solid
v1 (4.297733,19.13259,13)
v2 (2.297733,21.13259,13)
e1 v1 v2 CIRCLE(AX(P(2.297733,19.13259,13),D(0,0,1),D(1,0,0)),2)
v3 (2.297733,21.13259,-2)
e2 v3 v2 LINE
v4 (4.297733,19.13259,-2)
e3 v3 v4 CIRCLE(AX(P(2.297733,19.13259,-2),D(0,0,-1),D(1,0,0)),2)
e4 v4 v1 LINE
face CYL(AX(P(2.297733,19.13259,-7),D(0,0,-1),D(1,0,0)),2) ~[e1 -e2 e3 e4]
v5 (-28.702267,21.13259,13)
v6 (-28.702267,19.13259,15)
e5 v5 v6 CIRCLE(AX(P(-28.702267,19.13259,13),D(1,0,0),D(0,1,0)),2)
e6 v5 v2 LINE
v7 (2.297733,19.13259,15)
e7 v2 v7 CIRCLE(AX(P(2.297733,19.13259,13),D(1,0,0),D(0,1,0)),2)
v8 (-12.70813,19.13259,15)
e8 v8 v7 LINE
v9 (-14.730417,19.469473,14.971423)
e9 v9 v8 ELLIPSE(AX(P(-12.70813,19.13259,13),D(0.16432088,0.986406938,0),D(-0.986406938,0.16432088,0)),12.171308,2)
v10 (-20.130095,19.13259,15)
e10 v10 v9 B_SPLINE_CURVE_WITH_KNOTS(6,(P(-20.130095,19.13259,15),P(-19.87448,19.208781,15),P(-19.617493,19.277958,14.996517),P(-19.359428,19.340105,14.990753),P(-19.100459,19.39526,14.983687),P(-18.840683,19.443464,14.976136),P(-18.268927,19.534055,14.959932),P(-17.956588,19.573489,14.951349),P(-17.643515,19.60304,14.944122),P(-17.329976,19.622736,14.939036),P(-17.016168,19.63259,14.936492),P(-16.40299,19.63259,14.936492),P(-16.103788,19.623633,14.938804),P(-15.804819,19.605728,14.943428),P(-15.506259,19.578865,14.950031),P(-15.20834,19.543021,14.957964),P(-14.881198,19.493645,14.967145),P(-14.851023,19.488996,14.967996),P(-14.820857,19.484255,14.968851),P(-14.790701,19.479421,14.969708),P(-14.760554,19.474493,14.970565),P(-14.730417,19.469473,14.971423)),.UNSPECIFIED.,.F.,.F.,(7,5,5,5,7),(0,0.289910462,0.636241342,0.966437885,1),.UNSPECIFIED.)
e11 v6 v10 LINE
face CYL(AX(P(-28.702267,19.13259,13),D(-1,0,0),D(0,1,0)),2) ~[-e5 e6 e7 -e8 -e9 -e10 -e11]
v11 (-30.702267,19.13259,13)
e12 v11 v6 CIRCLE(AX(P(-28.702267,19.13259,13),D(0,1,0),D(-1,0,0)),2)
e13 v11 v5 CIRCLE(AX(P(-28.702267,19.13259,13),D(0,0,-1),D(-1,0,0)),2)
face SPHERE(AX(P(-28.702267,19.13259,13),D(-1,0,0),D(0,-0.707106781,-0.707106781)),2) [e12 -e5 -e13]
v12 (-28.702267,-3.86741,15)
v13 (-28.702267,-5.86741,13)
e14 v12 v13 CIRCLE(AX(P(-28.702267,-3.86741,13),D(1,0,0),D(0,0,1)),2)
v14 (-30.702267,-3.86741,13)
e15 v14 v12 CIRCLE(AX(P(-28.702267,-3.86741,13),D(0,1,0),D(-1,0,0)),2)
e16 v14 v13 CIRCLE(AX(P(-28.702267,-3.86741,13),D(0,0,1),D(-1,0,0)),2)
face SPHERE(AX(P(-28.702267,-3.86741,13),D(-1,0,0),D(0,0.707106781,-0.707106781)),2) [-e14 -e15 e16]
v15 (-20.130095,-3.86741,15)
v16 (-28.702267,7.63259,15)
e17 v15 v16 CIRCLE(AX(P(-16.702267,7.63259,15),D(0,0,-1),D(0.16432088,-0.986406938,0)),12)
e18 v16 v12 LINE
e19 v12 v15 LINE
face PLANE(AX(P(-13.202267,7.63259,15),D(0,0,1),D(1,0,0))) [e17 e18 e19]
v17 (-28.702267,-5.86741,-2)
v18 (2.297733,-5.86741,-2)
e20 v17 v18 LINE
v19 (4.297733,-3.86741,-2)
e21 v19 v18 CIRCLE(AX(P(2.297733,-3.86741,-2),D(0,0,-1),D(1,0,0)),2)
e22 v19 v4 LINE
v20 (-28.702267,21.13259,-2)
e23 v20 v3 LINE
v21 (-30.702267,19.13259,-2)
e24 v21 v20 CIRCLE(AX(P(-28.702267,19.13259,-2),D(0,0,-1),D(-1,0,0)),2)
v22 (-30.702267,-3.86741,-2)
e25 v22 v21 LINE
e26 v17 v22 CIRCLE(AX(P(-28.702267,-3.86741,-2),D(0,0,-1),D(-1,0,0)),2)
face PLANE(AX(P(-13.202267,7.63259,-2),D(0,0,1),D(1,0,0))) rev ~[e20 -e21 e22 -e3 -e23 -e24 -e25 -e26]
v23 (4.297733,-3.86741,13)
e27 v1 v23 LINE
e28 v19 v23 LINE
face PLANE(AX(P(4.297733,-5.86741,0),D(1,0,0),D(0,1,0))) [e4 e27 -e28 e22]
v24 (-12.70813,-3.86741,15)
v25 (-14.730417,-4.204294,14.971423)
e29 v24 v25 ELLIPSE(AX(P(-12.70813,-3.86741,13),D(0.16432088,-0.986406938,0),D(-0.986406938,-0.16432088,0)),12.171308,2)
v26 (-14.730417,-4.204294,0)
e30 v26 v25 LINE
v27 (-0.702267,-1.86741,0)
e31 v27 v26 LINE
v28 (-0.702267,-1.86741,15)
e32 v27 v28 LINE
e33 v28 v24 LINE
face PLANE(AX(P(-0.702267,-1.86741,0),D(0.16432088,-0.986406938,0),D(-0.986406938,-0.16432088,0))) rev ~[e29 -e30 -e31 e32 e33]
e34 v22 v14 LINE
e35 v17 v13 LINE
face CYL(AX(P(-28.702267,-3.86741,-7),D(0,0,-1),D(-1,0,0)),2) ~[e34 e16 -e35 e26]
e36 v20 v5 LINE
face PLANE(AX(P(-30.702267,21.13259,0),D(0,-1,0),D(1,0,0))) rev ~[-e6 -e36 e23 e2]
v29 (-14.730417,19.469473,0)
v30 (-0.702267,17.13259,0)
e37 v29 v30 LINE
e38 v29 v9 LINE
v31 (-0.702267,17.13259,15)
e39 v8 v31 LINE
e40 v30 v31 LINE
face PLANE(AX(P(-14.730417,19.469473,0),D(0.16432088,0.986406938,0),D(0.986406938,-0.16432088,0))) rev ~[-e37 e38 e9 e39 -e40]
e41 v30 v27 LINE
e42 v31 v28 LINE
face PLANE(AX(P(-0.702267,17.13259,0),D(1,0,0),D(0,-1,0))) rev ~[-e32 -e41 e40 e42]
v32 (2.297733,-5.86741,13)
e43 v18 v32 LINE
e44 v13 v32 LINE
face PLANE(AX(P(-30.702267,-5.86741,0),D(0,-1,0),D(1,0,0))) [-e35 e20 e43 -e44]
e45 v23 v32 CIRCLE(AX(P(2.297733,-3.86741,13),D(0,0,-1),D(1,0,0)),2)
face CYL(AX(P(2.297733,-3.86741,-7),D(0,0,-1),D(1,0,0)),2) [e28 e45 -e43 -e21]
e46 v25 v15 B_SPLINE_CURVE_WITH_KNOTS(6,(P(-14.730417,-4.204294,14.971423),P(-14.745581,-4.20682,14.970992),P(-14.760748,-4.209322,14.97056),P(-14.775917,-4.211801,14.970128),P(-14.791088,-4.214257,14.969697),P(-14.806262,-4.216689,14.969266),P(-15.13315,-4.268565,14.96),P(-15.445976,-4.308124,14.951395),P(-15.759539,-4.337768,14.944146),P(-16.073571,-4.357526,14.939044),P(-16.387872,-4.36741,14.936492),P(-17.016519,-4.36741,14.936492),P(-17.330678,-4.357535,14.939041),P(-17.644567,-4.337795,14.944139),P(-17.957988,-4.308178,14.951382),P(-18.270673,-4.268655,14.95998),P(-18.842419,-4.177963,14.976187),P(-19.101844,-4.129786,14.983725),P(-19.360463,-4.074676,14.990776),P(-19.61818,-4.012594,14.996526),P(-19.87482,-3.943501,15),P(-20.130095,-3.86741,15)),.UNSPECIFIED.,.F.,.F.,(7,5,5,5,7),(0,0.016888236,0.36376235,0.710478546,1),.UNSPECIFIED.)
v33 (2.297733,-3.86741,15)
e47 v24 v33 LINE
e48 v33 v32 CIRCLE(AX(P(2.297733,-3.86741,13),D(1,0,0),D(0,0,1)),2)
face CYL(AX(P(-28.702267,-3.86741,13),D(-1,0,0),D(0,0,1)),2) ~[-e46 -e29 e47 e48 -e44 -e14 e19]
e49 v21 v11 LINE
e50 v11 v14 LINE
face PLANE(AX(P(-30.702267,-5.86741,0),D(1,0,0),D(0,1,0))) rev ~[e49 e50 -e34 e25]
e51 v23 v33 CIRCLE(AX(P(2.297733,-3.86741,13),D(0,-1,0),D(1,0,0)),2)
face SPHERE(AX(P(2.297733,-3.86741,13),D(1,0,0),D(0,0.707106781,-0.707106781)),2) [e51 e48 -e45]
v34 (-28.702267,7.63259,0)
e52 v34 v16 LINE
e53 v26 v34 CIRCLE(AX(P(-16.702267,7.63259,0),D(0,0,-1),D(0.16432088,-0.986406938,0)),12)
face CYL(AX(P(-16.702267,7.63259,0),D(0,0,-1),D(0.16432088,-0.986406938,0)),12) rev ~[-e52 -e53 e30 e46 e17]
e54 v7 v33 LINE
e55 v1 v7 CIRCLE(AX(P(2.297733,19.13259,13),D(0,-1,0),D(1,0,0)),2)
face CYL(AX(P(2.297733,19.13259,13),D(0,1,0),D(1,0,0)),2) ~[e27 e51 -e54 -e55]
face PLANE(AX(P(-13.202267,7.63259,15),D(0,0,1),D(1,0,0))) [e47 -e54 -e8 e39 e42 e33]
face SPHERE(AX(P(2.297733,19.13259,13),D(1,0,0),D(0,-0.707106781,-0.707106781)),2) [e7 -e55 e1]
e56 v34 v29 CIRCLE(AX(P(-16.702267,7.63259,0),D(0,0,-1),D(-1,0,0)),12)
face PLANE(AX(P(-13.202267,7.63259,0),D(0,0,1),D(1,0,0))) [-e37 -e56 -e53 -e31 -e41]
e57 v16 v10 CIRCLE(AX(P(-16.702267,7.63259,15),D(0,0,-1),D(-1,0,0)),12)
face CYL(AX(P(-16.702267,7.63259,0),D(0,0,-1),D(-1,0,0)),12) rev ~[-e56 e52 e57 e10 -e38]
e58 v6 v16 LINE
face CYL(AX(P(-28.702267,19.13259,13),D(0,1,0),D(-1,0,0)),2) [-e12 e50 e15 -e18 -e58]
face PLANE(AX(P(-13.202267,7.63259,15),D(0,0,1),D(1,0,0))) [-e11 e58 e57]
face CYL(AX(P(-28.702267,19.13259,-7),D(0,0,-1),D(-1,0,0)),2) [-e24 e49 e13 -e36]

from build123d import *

# Parameters (mm, degrees)
F0_W         = 35
F0_H         = 27
F1_DEPTH     = 15
F2_DEPTH     = 2
F3_T1_DEPTH  = 20
F3_T3_DEPTH  = 31
F3_T5_DEPTH  = 23
F3_S9_W      = 2
F3_S9_H      = 2
F3_T10_DEPTH = 2
F3_S15_W     = 2
F3_S15_H     = 2
F3_T16_DEPTH = 2
F3_S21_W     = 2
F3_S21_H     = 2
F3_T22_DEPTH = 2
F3_S27_W     = 2
F3_S27_H     = 2
F3_T28_DEPTH = 2


# Not quite as in the source:
# - a fillet or chamfer that OpenCascade refuses, or shapes differently, is made with other operations: its cross-section is extruded or revolved along the edge and cut away or added


with BuildPart() as f1:
    # F0 (on Top) → F1 (new body)
    with BuildSketch(Plane.XY):
        with Locations((-13.2022674233, 7.6325895488)):
            Rectangle(F0_W, F0_H)
        with BuildLine():
            Line((-14.73041686, 19.4694728107), (-0.7022674233, 17.1325895488))
            Line((-0.7022674233, 17.1325895488), (-0.7022674233, 7.6325895488))
            Line((-0.7022674233, 7.6325895488), (-0.7022674233, -1.8674104512))
            Line((-0.7022674233, -1.8674104512), (-14.73041686, -4.2042937131))
            ThreePointArc((-14.73041686, -4.2042937131), (-24.4591286842, -1.5233431387), (-28.7022674233, 7.6325895488))
            ThreePointArc((-28.7022674233, 7.6325895488), (-24.4591286842, 16.7885222364), (-14.73041686, 19.4694728107))
        make_face(mode=Mode.SUBTRACT)
    extrude(amount=F1_DEPTH)

    # F0 (on Top) → F2 (join)
    with BuildSketch(Plane.XY):
        with Locations((-13.2022674233, 7.6325895488)):
            Rectangle(F0_W, F0_H)
        with BuildLine():
            Line((-14.73041686, 19.4694728107), (-0.7022674233, 17.1325895488))
            Line((-0.7022674233, 17.1325895488), (-0.7022674233, 7.6325895488))
            Line((-0.7022674233, 7.6325895488), (-0.7022674233, -1.8674104512))
            Line((-0.7022674233, -1.8674104512), (-14.73041686, -4.2042937131))
            ThreePointArc((-14.73041686, -4.2042937131), (-24.4591286842, -1.5233431387), (-28.7022674233, 7.6325895488))
            ThreePointArc((-28.7022674233, 7.6325895488), (-24.4591286842, 16.7885222364), (-14.73041686, 19.4694728107))
        make_face(mode=Mode.SUBTRACT)
        with BuildLine():
            ThreePointArc((-14.73041686, -4.2042937131), (-7.5463347357, -0.1242717121), (-4.7022674233, 7.6325895488))
            Line((-4.7022674233, 7.6325895488), (-28.7022674233, 7.6325895488))
            ThreePointArc((-28.7022674233, 7.6325895488), (-24.4591286842, -1.5233431387), (-14.73041686, -4.2042937131))
        make_face()
        with BuildLine():
            ThreePointArc((-4.7022674233, 7.6325895488), (-7.5463347357, 15.3894508097), (-14.73041686, 19.4694728107))
            ThreePointArc((-14.73041686, 19.4694728107), (-24.4591286842, 16.7885222364), (-28.7022674233, 7.6325895488))
            Line((-28.7022674233, 7.6325895488), (-4.7022674233, 7.6325895488))
        make_face()
        with BuildLine():
            Line((-0.7022674233, 7.6325895488), (-0.7022674233, 17.1325895488))
            Line((-0.7022674233, 17.1325895488), (-14.73041686, 19.4694728107))
            ThreePointArc((-14.73041686, 19.4694728107), (-7.5463347357, 15.3894508097), (-4.7022674233, 7.6325895488))
            Line((-4.7022674233, 7.6325895488), (-0.7022674233, 7.6325895488))
        make_face()
        with BuildLine():
            Line((-0.7022674233, -1.8674104512), (-0.7022674233, 7.6325895488))
            Line((-0.7022674233, 7.6325895488), (-4.7022674233, 7.6325895488))
            ThreePointArc((-4.7022674233, 7.6325895488), (-7.5463347357, -0.1242717121), (-14.73041686, -4.2042937131))
            Line((-14.73041686, -4.2042937131), (-0.7022674233, -1.8674104512))
        make_face()
    extrude(amount=-F2_DEPTH)

    # F3: fillet of radius 2 on 8 edges, made by hand

    # F3_s2 → F3_t1 (cut)
    with BuildSketch(Plane.XY.offset(-7)):
        with BuildLine():
            ThreePointArc((-30.7022674233, -3.8674104512), (-30.1164809856, -5.2816240135), (-28.7022674233, -5.8674104512))
            Line((-28.7022674233, -5.8674104512), (-30.7022674233, -5.8674104512))
            Line((-30.7022674233, -5.8674104512), (-30.7022674233, -3.8674104512))
        make_face()
        with BuildLine():
            ThreePointArc((4.2977325767, -3.8674104512), (3.7119461391, -5.2816240135), (2.2977325767, -5.8674104512))
            Line((2.2977325767, -5.8674104512), (4.2977325767, -5.8674104512))
            Line((4.2977325767, -5.8674104512), (4.2977325767, -3.8674104512))
        make_face()
        with BuildLine():
            ThreePointArc((4.2977325767, 19.1325895488), (3.7119461391, 20.5468031112), (2.2977325767, 21.1325895488))
            Line((2.2977325767, 21.1325895488), (4.2977325767, 21.1325895488))
            Line((4.2977325767, 21.1325895488), (4.2977325767, 19.1325895488))
        make_face()
        with BuildLine():
            ThreePointArc((-30.7022674233, 19.1325895488), (-30.1164809856, 20.5468031112), (-28.7022674233, 21.1325895488))
            Line((-28.7022674233, 21.1325895488), (-30.7022674233, 21.1325895488))
            Line((-30.7022674233, 21.1325895488), (-30.7022674233, 19.1325895488))
        make_face()
    extrude(amount=F3_T1_DEPTH, mode=Mode.SUBTRACT)

    # F3_s4 → F3_t3 (cut)
    with BuildSketch(Plane.YZ.offset(-28.7022674233)):
        with BuildLine():
            ThreePointArc((-3.8674104512, 15), (-5.2816240135, 14.4142135624), (-5.8674104512, 13))
            Line((-5.8674104512, 13), (-5.8674104512, 15))
            Line((-5.8674104512, 15), (-3.8674104512, 15))
        make_face()
        with BuildLine():
            ThreePointArc((21.1325895488, 13), (20.5468031112, 14.4142135624), (19.1325895488, 15))
            Line((19.1325895488, 15), (21.1325895488, 15))
            Line((21.1325895488, 15), (21.1325895488, 13))
        make_face()
    extrude(amount=F3_T3_DEPTH, mode=Mode.SUBTRACT)

    # F3_s6 → F3_t5 (cut)
    with BuildSketch(Plane.XZ.offset(-19.1325895488)):
        with BuildLine():
            ThreePointArc((4.2977325767, 13), (3.7119461391, 14.4142135624), (2.2977325767, 15))
            Line((2.2977325767, 15), (4.2977325767, 15))
            Line((4.2977325767, 15), (4.2977325767, 13))
        make_face()
        with BuildLine():
            ThreePointArc((-30.7022674233, 13), (-30.1164809856, 14.4142135624), (-28.7022674233, 15))
            Line((-28.7022674233, 15), (-30.7022674233, 15))
            Line((-30.7022674233, 15), (-30.7022674233, 13))
        make_face()
    extrude(amount=F3_T5_DEPTH, mode=Mode.SUBTRACT)


with BuildPart() as f3_tool8:
    # F3_s9 → F3_t10 (new body)
    with BuildSketch(Plane.YZ.offset(-28.7022674233)):
        with Locations((-4.8674104512, 14)):
            Rectangle(F3_S9_W, F3_S9_H)
    extrude(amount=-F3_T10_DEPTH)

    # F3_s11 → F3_t12 (revolve, cut)
    with BuildSketch(Plane(origin=(-28.7022674233, -3.8674104512, 13), x_dir=(0, 0.7071067812, -0.7071067812), z_dir=(0, 0.7071067812, 0.7071067812))):
        with BuildLine():
            ThreePointArc((0, -2), (2, 0), (0, 2))
            Line((0, 2), (0, -2))
        make_face()
    revolve(axis=Axis((-28.7022674233, -3.8674104512, 13), (-1, 0, 0)), mode=Mode.SUBTRACT)


with BuildPart() as f1_1:
    add(f1.part)

    # F3_t7: cut F3_tool8
    add(f3_tool8.part, mode=Mode.SUBTRACT)


with BuildPart() as f3_tool14:
    # F3_s15 → F3_t16 (new body)
    with BuildSketch(Plane.YZ.offset(2.2977325767)):
        with Locations((-4.8674104512, 14)):
            Rectangle(F3_S15_W, F3_S15_H)
    extrude(amount=F3_T16_DEPTH)

    # F3_s17 → F3_t18 (revolve, cut)
    with BuildSketch(Plane(origin=(2.2977325767, -3.8674104512, 13), x_dir=(0, 0.7071067812, -0.7071067812), z_dir=(0, -0.7071067812, -0.7071067812))):
        with BuildLine():
            ThreePointArc((0, -2), (2, 0), (0, 2))
            Line((0, 2), (0, -2))
        make_face()
    revolve(axis=Axis((2.2977325767, -3.8674104512, 13), (1, 0, 0)), mode=Mode.SUBTRACT)


with BuildPart() as f1_2:
    add(f1_1.part)

    # F3_t13: cut F3_tool14
    add(f3_tool14.part, mode=Mode.SUBTRACT)


with BuildPart() as f3_tool20:
    # F3_s21 → F3_t22 (new body)
    with BuildSketch(Plane.YZ.offset(2.2977325767)):
        with Locations((20.1325895488, 14)):
            Rectangle(F3_S21_W, F3_S21_H)
    extrude(amount=F3_T22_DEPTH)

    # F3_s23 → F3_t24 (revolve, cut)
    with BuildSketch(Plane(origin=(2.2977325767, 19.1325895488, 13), x_dir=(0, -0.7071067812, -0.7071067812), z_dir=(0, -0.7071067812, 0.7071067812))):
        with BuildLine():
            ThreePointArc((0, -2), (2, 0), (0, 2))
            Line((0, 2), (0, -2))
        make_face()
    revolve(axis=Axis((2.2977325767, 19.1325895488, 13), (1, 0, 0)), mode=Mode.SUBTRACT)


with BuildPart() as f1_3:
    add(f1_2.part)

    # F3_t19: cut F3_tool20
    add(f3_tool20.part, mode=Mode.SUBTRACT)


with BuildPart() as f3_tool26:
    # F3_s27 → F3_t28 (new body)
    with BuildSketch(Plane.YZ.offset(-28.7022674233)):
        with Locations((20.1325895488, 14)):
            Rectangle(F3_S27_W, F3_S27_H)
    extrude(amount=-F3_T28_DEPTH)

    # F3_s29 → F3_t30 (revolve, cut)
    with BuildSketch(Plane(origin=(-28.7022674233, 19.1325895488, 13), x_dir=(0, -0.7071067812, -0.7071067812), z_dir=(0, 0.7071067812, -0.7071067812))):
        with BuildLine():
            ThreePointArc((0, -2), (2, 0), (0, 2))
            Line((0, 2), (0, -2))
        make_face()
    revolve(axis=Axis((-28.7022674233, 19.1325895488, 13), (-1, 0, 0)), mode=Mode.SUBTRACT)


with BuildPart() as f1_4:
    add(f1_3.part)

    # F3_t25: cut F3_tool26
    add(f3_tool26.part, mode=Mode.SUBTRACT)


solid = f1_4.part
